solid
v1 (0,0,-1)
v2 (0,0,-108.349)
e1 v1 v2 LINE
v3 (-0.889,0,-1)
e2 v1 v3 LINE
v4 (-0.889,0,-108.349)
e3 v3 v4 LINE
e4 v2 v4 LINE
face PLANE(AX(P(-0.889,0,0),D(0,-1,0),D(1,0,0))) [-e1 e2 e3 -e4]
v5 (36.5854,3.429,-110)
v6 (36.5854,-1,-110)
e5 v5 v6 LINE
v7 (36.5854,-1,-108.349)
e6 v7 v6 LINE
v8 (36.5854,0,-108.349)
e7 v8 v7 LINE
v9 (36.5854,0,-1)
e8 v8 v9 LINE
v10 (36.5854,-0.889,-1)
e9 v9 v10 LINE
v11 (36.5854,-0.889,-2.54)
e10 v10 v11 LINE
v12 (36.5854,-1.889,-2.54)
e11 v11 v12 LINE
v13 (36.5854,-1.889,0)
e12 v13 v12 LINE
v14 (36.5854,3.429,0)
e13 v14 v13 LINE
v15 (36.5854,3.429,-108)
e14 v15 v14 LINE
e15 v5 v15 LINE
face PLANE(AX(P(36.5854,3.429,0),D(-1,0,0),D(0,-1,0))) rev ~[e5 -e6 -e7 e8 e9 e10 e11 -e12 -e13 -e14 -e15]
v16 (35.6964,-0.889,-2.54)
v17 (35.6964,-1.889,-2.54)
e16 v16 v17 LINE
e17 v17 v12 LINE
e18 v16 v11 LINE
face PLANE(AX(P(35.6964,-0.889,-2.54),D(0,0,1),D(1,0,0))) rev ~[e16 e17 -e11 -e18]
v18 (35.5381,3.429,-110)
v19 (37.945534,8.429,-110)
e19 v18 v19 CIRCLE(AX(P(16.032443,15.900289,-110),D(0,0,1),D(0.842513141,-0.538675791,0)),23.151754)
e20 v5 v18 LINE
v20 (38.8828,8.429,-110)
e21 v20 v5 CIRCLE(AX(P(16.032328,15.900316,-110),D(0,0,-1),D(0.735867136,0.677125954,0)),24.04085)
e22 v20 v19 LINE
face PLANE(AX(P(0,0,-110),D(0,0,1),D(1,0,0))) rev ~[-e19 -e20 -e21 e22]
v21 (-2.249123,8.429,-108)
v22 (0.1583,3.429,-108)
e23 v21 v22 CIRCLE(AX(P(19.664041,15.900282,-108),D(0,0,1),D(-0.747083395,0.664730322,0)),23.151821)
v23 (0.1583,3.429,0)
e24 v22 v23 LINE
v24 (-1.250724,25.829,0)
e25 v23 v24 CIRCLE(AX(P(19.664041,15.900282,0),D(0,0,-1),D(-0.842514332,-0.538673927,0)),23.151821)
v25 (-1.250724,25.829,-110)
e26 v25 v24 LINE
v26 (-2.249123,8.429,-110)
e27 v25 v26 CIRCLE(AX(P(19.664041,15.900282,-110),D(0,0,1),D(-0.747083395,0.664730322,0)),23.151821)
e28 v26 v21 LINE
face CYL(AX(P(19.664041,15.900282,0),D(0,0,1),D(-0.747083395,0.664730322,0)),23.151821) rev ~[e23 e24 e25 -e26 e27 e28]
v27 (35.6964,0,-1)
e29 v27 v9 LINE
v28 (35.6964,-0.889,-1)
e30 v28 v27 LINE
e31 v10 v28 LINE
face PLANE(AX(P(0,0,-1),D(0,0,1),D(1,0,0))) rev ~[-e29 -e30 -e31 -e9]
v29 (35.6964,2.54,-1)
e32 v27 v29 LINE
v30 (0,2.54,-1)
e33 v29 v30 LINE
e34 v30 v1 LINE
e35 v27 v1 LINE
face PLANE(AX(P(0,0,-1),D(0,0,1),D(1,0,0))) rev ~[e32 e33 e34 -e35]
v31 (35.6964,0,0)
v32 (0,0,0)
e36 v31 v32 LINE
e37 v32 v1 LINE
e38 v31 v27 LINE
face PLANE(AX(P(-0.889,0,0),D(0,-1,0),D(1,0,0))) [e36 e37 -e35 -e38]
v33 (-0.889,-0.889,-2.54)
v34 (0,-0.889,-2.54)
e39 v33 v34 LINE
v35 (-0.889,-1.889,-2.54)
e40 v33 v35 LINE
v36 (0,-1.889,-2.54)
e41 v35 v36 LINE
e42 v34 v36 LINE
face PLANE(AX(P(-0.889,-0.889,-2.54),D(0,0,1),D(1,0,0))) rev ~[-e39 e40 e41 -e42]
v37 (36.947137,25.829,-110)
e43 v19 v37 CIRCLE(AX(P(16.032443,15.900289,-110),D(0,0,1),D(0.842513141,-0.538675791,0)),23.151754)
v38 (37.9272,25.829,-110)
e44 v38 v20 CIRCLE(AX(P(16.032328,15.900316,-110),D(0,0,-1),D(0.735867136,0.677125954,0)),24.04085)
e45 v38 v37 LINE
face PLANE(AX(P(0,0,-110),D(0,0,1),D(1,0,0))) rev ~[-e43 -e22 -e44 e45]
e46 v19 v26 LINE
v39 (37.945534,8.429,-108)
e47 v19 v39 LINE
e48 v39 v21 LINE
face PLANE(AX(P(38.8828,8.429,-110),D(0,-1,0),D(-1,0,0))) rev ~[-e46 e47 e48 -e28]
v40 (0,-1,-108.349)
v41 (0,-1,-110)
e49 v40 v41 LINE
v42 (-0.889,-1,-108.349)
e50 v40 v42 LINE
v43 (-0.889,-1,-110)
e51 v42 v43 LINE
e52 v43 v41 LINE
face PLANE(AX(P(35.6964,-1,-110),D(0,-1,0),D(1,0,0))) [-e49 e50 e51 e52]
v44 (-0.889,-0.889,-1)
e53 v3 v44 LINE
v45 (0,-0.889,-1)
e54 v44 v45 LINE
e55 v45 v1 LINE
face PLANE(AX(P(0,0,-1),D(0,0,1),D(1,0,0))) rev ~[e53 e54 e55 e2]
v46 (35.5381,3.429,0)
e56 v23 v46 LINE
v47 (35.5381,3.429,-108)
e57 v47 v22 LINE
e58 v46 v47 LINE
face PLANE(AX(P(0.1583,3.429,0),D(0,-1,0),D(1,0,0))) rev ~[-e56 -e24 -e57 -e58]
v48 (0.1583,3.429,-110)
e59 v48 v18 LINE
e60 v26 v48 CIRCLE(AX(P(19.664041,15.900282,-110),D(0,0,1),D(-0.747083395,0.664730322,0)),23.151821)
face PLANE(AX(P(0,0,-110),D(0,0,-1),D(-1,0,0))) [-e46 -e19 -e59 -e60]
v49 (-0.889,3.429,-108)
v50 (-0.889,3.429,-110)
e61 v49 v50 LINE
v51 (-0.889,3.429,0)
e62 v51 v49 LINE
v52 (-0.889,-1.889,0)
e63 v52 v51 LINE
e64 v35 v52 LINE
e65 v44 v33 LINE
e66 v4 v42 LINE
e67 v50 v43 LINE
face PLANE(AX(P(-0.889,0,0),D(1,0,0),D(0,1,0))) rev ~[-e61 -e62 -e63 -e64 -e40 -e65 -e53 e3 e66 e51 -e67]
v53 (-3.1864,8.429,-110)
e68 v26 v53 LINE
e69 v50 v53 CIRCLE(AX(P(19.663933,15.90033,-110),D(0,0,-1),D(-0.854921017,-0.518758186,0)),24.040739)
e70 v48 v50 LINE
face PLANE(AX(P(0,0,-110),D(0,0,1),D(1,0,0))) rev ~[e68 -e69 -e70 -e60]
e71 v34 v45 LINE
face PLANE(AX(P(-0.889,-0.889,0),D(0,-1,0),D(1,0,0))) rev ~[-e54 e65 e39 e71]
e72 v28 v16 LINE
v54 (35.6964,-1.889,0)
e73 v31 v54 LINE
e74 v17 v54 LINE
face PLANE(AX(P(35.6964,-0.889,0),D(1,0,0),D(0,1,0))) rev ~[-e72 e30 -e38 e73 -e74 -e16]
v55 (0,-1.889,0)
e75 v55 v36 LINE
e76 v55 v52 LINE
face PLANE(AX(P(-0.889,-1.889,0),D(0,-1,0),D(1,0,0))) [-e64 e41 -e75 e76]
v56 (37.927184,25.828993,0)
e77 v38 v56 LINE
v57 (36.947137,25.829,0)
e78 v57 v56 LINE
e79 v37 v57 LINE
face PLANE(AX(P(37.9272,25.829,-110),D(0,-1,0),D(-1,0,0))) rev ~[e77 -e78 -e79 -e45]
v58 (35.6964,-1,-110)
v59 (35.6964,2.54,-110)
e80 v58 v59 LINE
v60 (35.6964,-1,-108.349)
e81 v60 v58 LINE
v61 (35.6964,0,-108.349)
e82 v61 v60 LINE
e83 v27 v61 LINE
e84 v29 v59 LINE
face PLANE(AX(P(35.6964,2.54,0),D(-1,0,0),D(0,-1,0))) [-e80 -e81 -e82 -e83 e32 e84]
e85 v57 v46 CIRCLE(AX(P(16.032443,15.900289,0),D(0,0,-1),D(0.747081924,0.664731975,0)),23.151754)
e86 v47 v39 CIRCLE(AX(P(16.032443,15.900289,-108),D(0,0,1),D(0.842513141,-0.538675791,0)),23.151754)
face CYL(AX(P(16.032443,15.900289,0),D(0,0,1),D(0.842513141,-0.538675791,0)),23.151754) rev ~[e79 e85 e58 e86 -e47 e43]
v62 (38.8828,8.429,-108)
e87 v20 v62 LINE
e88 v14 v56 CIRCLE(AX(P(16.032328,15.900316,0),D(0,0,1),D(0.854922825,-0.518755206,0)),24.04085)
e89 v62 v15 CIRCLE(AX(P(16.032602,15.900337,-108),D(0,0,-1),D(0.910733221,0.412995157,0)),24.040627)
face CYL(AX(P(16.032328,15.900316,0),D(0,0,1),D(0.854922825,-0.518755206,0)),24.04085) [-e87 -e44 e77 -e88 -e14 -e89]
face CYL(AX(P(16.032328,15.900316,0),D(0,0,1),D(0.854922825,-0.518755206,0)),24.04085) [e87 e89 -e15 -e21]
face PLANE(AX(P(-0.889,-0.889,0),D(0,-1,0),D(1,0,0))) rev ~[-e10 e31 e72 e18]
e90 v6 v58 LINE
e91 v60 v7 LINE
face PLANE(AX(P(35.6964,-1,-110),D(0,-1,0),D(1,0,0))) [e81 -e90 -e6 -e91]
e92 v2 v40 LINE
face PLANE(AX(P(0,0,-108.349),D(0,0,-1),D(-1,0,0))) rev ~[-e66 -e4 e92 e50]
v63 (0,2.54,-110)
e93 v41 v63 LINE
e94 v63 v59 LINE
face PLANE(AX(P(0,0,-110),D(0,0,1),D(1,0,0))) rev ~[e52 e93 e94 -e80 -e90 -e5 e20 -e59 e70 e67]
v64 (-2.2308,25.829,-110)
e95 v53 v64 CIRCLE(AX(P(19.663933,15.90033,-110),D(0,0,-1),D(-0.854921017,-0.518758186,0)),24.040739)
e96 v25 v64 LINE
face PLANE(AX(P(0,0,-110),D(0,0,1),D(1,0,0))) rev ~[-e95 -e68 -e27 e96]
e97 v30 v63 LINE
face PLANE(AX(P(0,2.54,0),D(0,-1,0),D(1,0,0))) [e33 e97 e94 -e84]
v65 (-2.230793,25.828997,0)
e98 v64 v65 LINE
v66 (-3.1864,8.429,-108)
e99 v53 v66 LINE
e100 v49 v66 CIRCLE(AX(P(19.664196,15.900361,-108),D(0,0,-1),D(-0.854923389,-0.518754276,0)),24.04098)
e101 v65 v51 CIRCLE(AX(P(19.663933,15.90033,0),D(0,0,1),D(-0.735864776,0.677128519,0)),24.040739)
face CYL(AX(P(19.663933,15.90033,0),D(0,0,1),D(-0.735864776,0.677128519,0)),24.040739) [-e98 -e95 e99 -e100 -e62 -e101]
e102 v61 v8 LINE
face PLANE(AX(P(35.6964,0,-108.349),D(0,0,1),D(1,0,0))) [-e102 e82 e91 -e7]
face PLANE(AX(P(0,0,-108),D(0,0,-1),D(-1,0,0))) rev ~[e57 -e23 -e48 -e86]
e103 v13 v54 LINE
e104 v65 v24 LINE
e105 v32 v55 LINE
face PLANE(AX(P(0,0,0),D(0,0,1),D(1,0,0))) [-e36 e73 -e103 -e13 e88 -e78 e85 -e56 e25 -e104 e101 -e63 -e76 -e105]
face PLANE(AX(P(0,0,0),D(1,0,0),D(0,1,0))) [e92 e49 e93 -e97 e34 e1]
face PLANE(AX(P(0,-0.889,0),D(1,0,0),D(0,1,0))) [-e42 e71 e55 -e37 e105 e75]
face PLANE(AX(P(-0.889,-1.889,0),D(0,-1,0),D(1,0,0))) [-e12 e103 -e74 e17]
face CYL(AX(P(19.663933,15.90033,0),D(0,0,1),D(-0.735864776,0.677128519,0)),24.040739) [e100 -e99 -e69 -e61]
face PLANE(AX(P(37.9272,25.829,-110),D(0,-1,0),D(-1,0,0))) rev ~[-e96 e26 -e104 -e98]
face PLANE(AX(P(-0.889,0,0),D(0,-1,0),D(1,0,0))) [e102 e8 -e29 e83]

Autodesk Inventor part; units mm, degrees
ref_plane "YZ Plane" through (0, 0, 0) normal (1, 0, 0) x (0, 1, 0)
ref_plane "XZ Plane" through (0, 0, 0) normal (0, 1, 0) x (-1, 0, 0)
ref_plane "XY Plane" through (0, 0, 0) normal (0, 0, 1) x (1, 0, 0)
sketch "Sketch1" plane through (0, 0, 0) normal (0, 0, 1) x (1, 0, 0)
  line L0 (0, 0) -> (0, 2.54)
  line L1 (0, 2.54) -> (35.6964, 2.54)
  line L2 (35.6964, 2.54) -> (35.6964, 0)
  line L3 (-0.889, 0) -> (-0.889, 3.429)
  line L4 (-0.889, 3.429) -> (36.5854, 3.429)
  line L5 (36.5854, 3.429) -> (36.5854, 0)
  line L6 (-0.889, 0) -> (0, 0)
  line L7 (35.6964, 0) -> (36.5854, 0)
  line L8 (33.7232, 32.179) -> (1.9732, 32.179)
  arc A0 (36.5854, 3.429) -> (33.7232, 32.179) centre (16.0324, 15.9003) ccw
  line L9 (17.8482, 3.429) -> (17.8482, 32.179) construction
  arc A1 (1.9732, 32.179) -> (-0.889, 3.429) centre (19.664, 15.9003) ccw
  line L10 (40.0732, 15.9003) -> (-4.3768, 15.9003)
  arc A2 (35.5381, 3.429) -> (33.3287, 31.29) centre (16.0324, 15.9003) ccw
  line L11 (33.3287, 31.29) -> (2.3677, 31.29)
  arc A3 (2.3677, 31.29) -> (0.1583, 3.429) centre (19.664, 15.9003) ccw
  dimension "d0" = 35.6964
  dimension "d1" = 2.54
  dimension "d2" = 2.54
  dimension "d3" = 0.889
  dimension "d11" = 28.75
  dimension "d14" = 31.75
  dimension "d15" = 0
  dimension "d16" = 44.45
  dimension "d17" = 0.889
extrude "Extrusion1" add sketch "Sketch1" against normal blind 110 contours L6 L3 L4 L5 L7 L2 L1 L0 | A1 L10 A3 L4 | A1 L8 A0 L10 A2 L11 A3 | A2 L10 A0 L4
sketch "Sketch2" plane through (0, 0, 0) normal (0, 0, 1) x (1, 0, 0)
  line L0 (-0.889, 3.429) -> (36.5854, 3.429)
  line L1 (36.5854, 3.429) -> (36.5854, 0)
  line L2 (36.5854, 0) -> (-0.889, 0)
  line L3 (-0.889, 0) -> (-0.889, 3.429)
  line L4 (36.5854, 0) -> (36.5854, 3.429) projected
  line L5 (35.6964, 0) -> (36.5854, 0) projected
  line L6 (35.5381, 3.429) -> (0.1583, 3.429) projected
  line L7 (-0.889, 3.429) -> (-0.889, 0) projected
extrude "Extrusion2" add sketch "Sketch2" against normal blind 1
sketch "Sketch3" plane through (0, 0, -110) normal (0, 0, -1) x (-1, 0, 0)
  arc A0 (-33.7232, 32.179) -> (-36.5854, 3.429) centre (-16.0324, 15.9003) ccw projected
  line L0 (-37.9272, 25.829) -> (2.2308, 25.829)
  line L1 (2.2308, 25.829) -> (2.2308, 32.179)
  line L2 (2.2308, 32.179) -> (-37.9272, 32.179)
  line L3 (-37.9272, 32.179) -> (-37.9272, 25.829)
  line L4 (-1.9732, 32.179) -> (-33.7232, 32.179) projected
  line L5 (-17.8482, 32.179) -> (-17.8482, 3.429)
  line L6 (-35.5381, 3.429) -> (-0.1583, 3.429) projected
  point P0 (0, 0)
  dimension "d18" = 0
  dimension "d19" = 6.35
extrude "Extrusion3" cut sketch "Sketch3" against normal through all contours L2 L5 L0 A0 | L2 L1 L0 L5
sketch "Sketch4" plane through (0, 0, 0) normal (0, 0, 1) x (1, 0, 0)
  line L0 (35.6964, 0) -> (35.6964, 2.54) projected
  line L1 (35.6964, 0) -> (36.5854, 0)
  line L2 (36.5854, 0) -> (36.5854, -0.889)
  line L3 (36.5854, -0.889) -> (35.6964, -0.889)
  line L4 (35.6964, -0.889) -> (35.6964, 0)
  line L5 (36.5854, 0) -> (36.5854, 3.429) projected
  line L6 (0, 0) -> (-0.889, 0)
  line L7 (-0.889, 0) -> (-0.889, -0.889)
  line L8 (-0.889, -0.889) -> (0, -0.889)
  line L9 (0, -0.889) -> (0, 0)
  line L10 (-0.889, 3.429) -> (-0.889, 0) projected
  dimension "d23" = 0.889
  dimension "d24" = 0.889
extrude "Extrusion4" add sketch "Sketch4" against normal blind 1
sketch "Sketch5" plane through (-0.889, -0.889, 0) normal (0, -1, 0) x (1, 0, 0)
  line L0 (0.889, 0) -> (0.889, -1) projected
  line L1 (0, -1) -> (0, -110) projected
  line L2 (0.889, 0) -> (0, 0)
  line L3 (0, 0) -> (0, -2.54)
  line L4 (0, -2.54) -> (0.889, -2.54)
  line L5 (0.889, -2.54) -> (0.889, 0)
  line L6 (37.4744, 0) -> (37.4744, -110) projected
  line L7 (37.4744, 0) -> (36.5854, 0)
  line L8 (36.5854, 0) -> (36.5854, -2.54)
  line L9 (36.5854, -2.54) -> (37.4744, -2.54)
  line L10 (37.4744, -2.54) -> (37.4744, 0)
  line L11 (36.5854, -1) -> (36.5854, -110) projected
  dimension "d27" = 2.54
  dimension "d28" = 2.54
extrude "Extrusion5" add sketch "Sketch5" along normal blind 1
sketch "Sketch6" plane through (35.6964, 0, -110) normal (0, -1, 0) x (1, 0, 0)
  line L0 (0.889, 110) -> (0.889, 0) projected
  line L1 (0, 109) -> (0, 0) projected
  line L2 (0.889, 0) -> (0, 0)
  line L3 (0, 0) -> (0, 1.651)
  line L4 (0, 1.651) -> (0.889, 1.651)
  line L5 (0.889, 1.651) -> (0.889, 0)
  line L6 (-36.5854, 109) -> (-36.5854, 0) projected
  line L7 (-35.6964, 109) -> (-35.6964, 0) projected
  line L8 (-36.5854, 0) -> (-35.6964, 0)
  line L9 (-35.6964, 0) -> (-35.6964, 1.651)
  line L10 (-35.6964, 1.651) -> (-36.5854, 1.651)
  line L11 (-36.5854, 1.651) -> (-36.5854, 0)
  point P0 (-35.6964, 110)
  point P1 (-36.5854, 1.651)
  point P2 (0.889, 1.651)
  dimension "d31" = 1.651
  dimension "d32" = 1.651
extrude "Extrusion6" add sketch "Sketch6" along normal blind 1
sketch "Sketch7" plane through (0, 0, -110) normal (0, 0, -1) x (-1, 0, 0)
  arc A0 (-37.9272, 25.829) -> (-36.5854, 3.429) centre (-16.0324, 15.9003) ccw projected
  arc A1 (-37.9272, 25.829) -> (-36.5854, 3.429) centre (-16.0324, 15.9003) ccw
  arc A2 (0.889, 3.429) -> (2.2308, 25.829) centre (-19.664, 15.9003) ccw projected
  arc A3 (0.889, 3.429) -> (2.2308, 25.829) centre (-19.664, 15.9003) ccw
  line L0 (-36.5854, 3.429) -> (0.889, 3.429)
  line L1 (-35.6964, 2.54) -> (0, 2.54) projected
  line L2 (-38.8828, 8.429) -> (3.1864, 8.429)
  point P0 (0, 0)
  point P1 (3.1864, 8.429)
  dimension "d35" = 5
extrude "Extrusion7" add sketch "Sketch7" against normal blind 2
properties part number "PCB Battery Tray_3DPrint"
